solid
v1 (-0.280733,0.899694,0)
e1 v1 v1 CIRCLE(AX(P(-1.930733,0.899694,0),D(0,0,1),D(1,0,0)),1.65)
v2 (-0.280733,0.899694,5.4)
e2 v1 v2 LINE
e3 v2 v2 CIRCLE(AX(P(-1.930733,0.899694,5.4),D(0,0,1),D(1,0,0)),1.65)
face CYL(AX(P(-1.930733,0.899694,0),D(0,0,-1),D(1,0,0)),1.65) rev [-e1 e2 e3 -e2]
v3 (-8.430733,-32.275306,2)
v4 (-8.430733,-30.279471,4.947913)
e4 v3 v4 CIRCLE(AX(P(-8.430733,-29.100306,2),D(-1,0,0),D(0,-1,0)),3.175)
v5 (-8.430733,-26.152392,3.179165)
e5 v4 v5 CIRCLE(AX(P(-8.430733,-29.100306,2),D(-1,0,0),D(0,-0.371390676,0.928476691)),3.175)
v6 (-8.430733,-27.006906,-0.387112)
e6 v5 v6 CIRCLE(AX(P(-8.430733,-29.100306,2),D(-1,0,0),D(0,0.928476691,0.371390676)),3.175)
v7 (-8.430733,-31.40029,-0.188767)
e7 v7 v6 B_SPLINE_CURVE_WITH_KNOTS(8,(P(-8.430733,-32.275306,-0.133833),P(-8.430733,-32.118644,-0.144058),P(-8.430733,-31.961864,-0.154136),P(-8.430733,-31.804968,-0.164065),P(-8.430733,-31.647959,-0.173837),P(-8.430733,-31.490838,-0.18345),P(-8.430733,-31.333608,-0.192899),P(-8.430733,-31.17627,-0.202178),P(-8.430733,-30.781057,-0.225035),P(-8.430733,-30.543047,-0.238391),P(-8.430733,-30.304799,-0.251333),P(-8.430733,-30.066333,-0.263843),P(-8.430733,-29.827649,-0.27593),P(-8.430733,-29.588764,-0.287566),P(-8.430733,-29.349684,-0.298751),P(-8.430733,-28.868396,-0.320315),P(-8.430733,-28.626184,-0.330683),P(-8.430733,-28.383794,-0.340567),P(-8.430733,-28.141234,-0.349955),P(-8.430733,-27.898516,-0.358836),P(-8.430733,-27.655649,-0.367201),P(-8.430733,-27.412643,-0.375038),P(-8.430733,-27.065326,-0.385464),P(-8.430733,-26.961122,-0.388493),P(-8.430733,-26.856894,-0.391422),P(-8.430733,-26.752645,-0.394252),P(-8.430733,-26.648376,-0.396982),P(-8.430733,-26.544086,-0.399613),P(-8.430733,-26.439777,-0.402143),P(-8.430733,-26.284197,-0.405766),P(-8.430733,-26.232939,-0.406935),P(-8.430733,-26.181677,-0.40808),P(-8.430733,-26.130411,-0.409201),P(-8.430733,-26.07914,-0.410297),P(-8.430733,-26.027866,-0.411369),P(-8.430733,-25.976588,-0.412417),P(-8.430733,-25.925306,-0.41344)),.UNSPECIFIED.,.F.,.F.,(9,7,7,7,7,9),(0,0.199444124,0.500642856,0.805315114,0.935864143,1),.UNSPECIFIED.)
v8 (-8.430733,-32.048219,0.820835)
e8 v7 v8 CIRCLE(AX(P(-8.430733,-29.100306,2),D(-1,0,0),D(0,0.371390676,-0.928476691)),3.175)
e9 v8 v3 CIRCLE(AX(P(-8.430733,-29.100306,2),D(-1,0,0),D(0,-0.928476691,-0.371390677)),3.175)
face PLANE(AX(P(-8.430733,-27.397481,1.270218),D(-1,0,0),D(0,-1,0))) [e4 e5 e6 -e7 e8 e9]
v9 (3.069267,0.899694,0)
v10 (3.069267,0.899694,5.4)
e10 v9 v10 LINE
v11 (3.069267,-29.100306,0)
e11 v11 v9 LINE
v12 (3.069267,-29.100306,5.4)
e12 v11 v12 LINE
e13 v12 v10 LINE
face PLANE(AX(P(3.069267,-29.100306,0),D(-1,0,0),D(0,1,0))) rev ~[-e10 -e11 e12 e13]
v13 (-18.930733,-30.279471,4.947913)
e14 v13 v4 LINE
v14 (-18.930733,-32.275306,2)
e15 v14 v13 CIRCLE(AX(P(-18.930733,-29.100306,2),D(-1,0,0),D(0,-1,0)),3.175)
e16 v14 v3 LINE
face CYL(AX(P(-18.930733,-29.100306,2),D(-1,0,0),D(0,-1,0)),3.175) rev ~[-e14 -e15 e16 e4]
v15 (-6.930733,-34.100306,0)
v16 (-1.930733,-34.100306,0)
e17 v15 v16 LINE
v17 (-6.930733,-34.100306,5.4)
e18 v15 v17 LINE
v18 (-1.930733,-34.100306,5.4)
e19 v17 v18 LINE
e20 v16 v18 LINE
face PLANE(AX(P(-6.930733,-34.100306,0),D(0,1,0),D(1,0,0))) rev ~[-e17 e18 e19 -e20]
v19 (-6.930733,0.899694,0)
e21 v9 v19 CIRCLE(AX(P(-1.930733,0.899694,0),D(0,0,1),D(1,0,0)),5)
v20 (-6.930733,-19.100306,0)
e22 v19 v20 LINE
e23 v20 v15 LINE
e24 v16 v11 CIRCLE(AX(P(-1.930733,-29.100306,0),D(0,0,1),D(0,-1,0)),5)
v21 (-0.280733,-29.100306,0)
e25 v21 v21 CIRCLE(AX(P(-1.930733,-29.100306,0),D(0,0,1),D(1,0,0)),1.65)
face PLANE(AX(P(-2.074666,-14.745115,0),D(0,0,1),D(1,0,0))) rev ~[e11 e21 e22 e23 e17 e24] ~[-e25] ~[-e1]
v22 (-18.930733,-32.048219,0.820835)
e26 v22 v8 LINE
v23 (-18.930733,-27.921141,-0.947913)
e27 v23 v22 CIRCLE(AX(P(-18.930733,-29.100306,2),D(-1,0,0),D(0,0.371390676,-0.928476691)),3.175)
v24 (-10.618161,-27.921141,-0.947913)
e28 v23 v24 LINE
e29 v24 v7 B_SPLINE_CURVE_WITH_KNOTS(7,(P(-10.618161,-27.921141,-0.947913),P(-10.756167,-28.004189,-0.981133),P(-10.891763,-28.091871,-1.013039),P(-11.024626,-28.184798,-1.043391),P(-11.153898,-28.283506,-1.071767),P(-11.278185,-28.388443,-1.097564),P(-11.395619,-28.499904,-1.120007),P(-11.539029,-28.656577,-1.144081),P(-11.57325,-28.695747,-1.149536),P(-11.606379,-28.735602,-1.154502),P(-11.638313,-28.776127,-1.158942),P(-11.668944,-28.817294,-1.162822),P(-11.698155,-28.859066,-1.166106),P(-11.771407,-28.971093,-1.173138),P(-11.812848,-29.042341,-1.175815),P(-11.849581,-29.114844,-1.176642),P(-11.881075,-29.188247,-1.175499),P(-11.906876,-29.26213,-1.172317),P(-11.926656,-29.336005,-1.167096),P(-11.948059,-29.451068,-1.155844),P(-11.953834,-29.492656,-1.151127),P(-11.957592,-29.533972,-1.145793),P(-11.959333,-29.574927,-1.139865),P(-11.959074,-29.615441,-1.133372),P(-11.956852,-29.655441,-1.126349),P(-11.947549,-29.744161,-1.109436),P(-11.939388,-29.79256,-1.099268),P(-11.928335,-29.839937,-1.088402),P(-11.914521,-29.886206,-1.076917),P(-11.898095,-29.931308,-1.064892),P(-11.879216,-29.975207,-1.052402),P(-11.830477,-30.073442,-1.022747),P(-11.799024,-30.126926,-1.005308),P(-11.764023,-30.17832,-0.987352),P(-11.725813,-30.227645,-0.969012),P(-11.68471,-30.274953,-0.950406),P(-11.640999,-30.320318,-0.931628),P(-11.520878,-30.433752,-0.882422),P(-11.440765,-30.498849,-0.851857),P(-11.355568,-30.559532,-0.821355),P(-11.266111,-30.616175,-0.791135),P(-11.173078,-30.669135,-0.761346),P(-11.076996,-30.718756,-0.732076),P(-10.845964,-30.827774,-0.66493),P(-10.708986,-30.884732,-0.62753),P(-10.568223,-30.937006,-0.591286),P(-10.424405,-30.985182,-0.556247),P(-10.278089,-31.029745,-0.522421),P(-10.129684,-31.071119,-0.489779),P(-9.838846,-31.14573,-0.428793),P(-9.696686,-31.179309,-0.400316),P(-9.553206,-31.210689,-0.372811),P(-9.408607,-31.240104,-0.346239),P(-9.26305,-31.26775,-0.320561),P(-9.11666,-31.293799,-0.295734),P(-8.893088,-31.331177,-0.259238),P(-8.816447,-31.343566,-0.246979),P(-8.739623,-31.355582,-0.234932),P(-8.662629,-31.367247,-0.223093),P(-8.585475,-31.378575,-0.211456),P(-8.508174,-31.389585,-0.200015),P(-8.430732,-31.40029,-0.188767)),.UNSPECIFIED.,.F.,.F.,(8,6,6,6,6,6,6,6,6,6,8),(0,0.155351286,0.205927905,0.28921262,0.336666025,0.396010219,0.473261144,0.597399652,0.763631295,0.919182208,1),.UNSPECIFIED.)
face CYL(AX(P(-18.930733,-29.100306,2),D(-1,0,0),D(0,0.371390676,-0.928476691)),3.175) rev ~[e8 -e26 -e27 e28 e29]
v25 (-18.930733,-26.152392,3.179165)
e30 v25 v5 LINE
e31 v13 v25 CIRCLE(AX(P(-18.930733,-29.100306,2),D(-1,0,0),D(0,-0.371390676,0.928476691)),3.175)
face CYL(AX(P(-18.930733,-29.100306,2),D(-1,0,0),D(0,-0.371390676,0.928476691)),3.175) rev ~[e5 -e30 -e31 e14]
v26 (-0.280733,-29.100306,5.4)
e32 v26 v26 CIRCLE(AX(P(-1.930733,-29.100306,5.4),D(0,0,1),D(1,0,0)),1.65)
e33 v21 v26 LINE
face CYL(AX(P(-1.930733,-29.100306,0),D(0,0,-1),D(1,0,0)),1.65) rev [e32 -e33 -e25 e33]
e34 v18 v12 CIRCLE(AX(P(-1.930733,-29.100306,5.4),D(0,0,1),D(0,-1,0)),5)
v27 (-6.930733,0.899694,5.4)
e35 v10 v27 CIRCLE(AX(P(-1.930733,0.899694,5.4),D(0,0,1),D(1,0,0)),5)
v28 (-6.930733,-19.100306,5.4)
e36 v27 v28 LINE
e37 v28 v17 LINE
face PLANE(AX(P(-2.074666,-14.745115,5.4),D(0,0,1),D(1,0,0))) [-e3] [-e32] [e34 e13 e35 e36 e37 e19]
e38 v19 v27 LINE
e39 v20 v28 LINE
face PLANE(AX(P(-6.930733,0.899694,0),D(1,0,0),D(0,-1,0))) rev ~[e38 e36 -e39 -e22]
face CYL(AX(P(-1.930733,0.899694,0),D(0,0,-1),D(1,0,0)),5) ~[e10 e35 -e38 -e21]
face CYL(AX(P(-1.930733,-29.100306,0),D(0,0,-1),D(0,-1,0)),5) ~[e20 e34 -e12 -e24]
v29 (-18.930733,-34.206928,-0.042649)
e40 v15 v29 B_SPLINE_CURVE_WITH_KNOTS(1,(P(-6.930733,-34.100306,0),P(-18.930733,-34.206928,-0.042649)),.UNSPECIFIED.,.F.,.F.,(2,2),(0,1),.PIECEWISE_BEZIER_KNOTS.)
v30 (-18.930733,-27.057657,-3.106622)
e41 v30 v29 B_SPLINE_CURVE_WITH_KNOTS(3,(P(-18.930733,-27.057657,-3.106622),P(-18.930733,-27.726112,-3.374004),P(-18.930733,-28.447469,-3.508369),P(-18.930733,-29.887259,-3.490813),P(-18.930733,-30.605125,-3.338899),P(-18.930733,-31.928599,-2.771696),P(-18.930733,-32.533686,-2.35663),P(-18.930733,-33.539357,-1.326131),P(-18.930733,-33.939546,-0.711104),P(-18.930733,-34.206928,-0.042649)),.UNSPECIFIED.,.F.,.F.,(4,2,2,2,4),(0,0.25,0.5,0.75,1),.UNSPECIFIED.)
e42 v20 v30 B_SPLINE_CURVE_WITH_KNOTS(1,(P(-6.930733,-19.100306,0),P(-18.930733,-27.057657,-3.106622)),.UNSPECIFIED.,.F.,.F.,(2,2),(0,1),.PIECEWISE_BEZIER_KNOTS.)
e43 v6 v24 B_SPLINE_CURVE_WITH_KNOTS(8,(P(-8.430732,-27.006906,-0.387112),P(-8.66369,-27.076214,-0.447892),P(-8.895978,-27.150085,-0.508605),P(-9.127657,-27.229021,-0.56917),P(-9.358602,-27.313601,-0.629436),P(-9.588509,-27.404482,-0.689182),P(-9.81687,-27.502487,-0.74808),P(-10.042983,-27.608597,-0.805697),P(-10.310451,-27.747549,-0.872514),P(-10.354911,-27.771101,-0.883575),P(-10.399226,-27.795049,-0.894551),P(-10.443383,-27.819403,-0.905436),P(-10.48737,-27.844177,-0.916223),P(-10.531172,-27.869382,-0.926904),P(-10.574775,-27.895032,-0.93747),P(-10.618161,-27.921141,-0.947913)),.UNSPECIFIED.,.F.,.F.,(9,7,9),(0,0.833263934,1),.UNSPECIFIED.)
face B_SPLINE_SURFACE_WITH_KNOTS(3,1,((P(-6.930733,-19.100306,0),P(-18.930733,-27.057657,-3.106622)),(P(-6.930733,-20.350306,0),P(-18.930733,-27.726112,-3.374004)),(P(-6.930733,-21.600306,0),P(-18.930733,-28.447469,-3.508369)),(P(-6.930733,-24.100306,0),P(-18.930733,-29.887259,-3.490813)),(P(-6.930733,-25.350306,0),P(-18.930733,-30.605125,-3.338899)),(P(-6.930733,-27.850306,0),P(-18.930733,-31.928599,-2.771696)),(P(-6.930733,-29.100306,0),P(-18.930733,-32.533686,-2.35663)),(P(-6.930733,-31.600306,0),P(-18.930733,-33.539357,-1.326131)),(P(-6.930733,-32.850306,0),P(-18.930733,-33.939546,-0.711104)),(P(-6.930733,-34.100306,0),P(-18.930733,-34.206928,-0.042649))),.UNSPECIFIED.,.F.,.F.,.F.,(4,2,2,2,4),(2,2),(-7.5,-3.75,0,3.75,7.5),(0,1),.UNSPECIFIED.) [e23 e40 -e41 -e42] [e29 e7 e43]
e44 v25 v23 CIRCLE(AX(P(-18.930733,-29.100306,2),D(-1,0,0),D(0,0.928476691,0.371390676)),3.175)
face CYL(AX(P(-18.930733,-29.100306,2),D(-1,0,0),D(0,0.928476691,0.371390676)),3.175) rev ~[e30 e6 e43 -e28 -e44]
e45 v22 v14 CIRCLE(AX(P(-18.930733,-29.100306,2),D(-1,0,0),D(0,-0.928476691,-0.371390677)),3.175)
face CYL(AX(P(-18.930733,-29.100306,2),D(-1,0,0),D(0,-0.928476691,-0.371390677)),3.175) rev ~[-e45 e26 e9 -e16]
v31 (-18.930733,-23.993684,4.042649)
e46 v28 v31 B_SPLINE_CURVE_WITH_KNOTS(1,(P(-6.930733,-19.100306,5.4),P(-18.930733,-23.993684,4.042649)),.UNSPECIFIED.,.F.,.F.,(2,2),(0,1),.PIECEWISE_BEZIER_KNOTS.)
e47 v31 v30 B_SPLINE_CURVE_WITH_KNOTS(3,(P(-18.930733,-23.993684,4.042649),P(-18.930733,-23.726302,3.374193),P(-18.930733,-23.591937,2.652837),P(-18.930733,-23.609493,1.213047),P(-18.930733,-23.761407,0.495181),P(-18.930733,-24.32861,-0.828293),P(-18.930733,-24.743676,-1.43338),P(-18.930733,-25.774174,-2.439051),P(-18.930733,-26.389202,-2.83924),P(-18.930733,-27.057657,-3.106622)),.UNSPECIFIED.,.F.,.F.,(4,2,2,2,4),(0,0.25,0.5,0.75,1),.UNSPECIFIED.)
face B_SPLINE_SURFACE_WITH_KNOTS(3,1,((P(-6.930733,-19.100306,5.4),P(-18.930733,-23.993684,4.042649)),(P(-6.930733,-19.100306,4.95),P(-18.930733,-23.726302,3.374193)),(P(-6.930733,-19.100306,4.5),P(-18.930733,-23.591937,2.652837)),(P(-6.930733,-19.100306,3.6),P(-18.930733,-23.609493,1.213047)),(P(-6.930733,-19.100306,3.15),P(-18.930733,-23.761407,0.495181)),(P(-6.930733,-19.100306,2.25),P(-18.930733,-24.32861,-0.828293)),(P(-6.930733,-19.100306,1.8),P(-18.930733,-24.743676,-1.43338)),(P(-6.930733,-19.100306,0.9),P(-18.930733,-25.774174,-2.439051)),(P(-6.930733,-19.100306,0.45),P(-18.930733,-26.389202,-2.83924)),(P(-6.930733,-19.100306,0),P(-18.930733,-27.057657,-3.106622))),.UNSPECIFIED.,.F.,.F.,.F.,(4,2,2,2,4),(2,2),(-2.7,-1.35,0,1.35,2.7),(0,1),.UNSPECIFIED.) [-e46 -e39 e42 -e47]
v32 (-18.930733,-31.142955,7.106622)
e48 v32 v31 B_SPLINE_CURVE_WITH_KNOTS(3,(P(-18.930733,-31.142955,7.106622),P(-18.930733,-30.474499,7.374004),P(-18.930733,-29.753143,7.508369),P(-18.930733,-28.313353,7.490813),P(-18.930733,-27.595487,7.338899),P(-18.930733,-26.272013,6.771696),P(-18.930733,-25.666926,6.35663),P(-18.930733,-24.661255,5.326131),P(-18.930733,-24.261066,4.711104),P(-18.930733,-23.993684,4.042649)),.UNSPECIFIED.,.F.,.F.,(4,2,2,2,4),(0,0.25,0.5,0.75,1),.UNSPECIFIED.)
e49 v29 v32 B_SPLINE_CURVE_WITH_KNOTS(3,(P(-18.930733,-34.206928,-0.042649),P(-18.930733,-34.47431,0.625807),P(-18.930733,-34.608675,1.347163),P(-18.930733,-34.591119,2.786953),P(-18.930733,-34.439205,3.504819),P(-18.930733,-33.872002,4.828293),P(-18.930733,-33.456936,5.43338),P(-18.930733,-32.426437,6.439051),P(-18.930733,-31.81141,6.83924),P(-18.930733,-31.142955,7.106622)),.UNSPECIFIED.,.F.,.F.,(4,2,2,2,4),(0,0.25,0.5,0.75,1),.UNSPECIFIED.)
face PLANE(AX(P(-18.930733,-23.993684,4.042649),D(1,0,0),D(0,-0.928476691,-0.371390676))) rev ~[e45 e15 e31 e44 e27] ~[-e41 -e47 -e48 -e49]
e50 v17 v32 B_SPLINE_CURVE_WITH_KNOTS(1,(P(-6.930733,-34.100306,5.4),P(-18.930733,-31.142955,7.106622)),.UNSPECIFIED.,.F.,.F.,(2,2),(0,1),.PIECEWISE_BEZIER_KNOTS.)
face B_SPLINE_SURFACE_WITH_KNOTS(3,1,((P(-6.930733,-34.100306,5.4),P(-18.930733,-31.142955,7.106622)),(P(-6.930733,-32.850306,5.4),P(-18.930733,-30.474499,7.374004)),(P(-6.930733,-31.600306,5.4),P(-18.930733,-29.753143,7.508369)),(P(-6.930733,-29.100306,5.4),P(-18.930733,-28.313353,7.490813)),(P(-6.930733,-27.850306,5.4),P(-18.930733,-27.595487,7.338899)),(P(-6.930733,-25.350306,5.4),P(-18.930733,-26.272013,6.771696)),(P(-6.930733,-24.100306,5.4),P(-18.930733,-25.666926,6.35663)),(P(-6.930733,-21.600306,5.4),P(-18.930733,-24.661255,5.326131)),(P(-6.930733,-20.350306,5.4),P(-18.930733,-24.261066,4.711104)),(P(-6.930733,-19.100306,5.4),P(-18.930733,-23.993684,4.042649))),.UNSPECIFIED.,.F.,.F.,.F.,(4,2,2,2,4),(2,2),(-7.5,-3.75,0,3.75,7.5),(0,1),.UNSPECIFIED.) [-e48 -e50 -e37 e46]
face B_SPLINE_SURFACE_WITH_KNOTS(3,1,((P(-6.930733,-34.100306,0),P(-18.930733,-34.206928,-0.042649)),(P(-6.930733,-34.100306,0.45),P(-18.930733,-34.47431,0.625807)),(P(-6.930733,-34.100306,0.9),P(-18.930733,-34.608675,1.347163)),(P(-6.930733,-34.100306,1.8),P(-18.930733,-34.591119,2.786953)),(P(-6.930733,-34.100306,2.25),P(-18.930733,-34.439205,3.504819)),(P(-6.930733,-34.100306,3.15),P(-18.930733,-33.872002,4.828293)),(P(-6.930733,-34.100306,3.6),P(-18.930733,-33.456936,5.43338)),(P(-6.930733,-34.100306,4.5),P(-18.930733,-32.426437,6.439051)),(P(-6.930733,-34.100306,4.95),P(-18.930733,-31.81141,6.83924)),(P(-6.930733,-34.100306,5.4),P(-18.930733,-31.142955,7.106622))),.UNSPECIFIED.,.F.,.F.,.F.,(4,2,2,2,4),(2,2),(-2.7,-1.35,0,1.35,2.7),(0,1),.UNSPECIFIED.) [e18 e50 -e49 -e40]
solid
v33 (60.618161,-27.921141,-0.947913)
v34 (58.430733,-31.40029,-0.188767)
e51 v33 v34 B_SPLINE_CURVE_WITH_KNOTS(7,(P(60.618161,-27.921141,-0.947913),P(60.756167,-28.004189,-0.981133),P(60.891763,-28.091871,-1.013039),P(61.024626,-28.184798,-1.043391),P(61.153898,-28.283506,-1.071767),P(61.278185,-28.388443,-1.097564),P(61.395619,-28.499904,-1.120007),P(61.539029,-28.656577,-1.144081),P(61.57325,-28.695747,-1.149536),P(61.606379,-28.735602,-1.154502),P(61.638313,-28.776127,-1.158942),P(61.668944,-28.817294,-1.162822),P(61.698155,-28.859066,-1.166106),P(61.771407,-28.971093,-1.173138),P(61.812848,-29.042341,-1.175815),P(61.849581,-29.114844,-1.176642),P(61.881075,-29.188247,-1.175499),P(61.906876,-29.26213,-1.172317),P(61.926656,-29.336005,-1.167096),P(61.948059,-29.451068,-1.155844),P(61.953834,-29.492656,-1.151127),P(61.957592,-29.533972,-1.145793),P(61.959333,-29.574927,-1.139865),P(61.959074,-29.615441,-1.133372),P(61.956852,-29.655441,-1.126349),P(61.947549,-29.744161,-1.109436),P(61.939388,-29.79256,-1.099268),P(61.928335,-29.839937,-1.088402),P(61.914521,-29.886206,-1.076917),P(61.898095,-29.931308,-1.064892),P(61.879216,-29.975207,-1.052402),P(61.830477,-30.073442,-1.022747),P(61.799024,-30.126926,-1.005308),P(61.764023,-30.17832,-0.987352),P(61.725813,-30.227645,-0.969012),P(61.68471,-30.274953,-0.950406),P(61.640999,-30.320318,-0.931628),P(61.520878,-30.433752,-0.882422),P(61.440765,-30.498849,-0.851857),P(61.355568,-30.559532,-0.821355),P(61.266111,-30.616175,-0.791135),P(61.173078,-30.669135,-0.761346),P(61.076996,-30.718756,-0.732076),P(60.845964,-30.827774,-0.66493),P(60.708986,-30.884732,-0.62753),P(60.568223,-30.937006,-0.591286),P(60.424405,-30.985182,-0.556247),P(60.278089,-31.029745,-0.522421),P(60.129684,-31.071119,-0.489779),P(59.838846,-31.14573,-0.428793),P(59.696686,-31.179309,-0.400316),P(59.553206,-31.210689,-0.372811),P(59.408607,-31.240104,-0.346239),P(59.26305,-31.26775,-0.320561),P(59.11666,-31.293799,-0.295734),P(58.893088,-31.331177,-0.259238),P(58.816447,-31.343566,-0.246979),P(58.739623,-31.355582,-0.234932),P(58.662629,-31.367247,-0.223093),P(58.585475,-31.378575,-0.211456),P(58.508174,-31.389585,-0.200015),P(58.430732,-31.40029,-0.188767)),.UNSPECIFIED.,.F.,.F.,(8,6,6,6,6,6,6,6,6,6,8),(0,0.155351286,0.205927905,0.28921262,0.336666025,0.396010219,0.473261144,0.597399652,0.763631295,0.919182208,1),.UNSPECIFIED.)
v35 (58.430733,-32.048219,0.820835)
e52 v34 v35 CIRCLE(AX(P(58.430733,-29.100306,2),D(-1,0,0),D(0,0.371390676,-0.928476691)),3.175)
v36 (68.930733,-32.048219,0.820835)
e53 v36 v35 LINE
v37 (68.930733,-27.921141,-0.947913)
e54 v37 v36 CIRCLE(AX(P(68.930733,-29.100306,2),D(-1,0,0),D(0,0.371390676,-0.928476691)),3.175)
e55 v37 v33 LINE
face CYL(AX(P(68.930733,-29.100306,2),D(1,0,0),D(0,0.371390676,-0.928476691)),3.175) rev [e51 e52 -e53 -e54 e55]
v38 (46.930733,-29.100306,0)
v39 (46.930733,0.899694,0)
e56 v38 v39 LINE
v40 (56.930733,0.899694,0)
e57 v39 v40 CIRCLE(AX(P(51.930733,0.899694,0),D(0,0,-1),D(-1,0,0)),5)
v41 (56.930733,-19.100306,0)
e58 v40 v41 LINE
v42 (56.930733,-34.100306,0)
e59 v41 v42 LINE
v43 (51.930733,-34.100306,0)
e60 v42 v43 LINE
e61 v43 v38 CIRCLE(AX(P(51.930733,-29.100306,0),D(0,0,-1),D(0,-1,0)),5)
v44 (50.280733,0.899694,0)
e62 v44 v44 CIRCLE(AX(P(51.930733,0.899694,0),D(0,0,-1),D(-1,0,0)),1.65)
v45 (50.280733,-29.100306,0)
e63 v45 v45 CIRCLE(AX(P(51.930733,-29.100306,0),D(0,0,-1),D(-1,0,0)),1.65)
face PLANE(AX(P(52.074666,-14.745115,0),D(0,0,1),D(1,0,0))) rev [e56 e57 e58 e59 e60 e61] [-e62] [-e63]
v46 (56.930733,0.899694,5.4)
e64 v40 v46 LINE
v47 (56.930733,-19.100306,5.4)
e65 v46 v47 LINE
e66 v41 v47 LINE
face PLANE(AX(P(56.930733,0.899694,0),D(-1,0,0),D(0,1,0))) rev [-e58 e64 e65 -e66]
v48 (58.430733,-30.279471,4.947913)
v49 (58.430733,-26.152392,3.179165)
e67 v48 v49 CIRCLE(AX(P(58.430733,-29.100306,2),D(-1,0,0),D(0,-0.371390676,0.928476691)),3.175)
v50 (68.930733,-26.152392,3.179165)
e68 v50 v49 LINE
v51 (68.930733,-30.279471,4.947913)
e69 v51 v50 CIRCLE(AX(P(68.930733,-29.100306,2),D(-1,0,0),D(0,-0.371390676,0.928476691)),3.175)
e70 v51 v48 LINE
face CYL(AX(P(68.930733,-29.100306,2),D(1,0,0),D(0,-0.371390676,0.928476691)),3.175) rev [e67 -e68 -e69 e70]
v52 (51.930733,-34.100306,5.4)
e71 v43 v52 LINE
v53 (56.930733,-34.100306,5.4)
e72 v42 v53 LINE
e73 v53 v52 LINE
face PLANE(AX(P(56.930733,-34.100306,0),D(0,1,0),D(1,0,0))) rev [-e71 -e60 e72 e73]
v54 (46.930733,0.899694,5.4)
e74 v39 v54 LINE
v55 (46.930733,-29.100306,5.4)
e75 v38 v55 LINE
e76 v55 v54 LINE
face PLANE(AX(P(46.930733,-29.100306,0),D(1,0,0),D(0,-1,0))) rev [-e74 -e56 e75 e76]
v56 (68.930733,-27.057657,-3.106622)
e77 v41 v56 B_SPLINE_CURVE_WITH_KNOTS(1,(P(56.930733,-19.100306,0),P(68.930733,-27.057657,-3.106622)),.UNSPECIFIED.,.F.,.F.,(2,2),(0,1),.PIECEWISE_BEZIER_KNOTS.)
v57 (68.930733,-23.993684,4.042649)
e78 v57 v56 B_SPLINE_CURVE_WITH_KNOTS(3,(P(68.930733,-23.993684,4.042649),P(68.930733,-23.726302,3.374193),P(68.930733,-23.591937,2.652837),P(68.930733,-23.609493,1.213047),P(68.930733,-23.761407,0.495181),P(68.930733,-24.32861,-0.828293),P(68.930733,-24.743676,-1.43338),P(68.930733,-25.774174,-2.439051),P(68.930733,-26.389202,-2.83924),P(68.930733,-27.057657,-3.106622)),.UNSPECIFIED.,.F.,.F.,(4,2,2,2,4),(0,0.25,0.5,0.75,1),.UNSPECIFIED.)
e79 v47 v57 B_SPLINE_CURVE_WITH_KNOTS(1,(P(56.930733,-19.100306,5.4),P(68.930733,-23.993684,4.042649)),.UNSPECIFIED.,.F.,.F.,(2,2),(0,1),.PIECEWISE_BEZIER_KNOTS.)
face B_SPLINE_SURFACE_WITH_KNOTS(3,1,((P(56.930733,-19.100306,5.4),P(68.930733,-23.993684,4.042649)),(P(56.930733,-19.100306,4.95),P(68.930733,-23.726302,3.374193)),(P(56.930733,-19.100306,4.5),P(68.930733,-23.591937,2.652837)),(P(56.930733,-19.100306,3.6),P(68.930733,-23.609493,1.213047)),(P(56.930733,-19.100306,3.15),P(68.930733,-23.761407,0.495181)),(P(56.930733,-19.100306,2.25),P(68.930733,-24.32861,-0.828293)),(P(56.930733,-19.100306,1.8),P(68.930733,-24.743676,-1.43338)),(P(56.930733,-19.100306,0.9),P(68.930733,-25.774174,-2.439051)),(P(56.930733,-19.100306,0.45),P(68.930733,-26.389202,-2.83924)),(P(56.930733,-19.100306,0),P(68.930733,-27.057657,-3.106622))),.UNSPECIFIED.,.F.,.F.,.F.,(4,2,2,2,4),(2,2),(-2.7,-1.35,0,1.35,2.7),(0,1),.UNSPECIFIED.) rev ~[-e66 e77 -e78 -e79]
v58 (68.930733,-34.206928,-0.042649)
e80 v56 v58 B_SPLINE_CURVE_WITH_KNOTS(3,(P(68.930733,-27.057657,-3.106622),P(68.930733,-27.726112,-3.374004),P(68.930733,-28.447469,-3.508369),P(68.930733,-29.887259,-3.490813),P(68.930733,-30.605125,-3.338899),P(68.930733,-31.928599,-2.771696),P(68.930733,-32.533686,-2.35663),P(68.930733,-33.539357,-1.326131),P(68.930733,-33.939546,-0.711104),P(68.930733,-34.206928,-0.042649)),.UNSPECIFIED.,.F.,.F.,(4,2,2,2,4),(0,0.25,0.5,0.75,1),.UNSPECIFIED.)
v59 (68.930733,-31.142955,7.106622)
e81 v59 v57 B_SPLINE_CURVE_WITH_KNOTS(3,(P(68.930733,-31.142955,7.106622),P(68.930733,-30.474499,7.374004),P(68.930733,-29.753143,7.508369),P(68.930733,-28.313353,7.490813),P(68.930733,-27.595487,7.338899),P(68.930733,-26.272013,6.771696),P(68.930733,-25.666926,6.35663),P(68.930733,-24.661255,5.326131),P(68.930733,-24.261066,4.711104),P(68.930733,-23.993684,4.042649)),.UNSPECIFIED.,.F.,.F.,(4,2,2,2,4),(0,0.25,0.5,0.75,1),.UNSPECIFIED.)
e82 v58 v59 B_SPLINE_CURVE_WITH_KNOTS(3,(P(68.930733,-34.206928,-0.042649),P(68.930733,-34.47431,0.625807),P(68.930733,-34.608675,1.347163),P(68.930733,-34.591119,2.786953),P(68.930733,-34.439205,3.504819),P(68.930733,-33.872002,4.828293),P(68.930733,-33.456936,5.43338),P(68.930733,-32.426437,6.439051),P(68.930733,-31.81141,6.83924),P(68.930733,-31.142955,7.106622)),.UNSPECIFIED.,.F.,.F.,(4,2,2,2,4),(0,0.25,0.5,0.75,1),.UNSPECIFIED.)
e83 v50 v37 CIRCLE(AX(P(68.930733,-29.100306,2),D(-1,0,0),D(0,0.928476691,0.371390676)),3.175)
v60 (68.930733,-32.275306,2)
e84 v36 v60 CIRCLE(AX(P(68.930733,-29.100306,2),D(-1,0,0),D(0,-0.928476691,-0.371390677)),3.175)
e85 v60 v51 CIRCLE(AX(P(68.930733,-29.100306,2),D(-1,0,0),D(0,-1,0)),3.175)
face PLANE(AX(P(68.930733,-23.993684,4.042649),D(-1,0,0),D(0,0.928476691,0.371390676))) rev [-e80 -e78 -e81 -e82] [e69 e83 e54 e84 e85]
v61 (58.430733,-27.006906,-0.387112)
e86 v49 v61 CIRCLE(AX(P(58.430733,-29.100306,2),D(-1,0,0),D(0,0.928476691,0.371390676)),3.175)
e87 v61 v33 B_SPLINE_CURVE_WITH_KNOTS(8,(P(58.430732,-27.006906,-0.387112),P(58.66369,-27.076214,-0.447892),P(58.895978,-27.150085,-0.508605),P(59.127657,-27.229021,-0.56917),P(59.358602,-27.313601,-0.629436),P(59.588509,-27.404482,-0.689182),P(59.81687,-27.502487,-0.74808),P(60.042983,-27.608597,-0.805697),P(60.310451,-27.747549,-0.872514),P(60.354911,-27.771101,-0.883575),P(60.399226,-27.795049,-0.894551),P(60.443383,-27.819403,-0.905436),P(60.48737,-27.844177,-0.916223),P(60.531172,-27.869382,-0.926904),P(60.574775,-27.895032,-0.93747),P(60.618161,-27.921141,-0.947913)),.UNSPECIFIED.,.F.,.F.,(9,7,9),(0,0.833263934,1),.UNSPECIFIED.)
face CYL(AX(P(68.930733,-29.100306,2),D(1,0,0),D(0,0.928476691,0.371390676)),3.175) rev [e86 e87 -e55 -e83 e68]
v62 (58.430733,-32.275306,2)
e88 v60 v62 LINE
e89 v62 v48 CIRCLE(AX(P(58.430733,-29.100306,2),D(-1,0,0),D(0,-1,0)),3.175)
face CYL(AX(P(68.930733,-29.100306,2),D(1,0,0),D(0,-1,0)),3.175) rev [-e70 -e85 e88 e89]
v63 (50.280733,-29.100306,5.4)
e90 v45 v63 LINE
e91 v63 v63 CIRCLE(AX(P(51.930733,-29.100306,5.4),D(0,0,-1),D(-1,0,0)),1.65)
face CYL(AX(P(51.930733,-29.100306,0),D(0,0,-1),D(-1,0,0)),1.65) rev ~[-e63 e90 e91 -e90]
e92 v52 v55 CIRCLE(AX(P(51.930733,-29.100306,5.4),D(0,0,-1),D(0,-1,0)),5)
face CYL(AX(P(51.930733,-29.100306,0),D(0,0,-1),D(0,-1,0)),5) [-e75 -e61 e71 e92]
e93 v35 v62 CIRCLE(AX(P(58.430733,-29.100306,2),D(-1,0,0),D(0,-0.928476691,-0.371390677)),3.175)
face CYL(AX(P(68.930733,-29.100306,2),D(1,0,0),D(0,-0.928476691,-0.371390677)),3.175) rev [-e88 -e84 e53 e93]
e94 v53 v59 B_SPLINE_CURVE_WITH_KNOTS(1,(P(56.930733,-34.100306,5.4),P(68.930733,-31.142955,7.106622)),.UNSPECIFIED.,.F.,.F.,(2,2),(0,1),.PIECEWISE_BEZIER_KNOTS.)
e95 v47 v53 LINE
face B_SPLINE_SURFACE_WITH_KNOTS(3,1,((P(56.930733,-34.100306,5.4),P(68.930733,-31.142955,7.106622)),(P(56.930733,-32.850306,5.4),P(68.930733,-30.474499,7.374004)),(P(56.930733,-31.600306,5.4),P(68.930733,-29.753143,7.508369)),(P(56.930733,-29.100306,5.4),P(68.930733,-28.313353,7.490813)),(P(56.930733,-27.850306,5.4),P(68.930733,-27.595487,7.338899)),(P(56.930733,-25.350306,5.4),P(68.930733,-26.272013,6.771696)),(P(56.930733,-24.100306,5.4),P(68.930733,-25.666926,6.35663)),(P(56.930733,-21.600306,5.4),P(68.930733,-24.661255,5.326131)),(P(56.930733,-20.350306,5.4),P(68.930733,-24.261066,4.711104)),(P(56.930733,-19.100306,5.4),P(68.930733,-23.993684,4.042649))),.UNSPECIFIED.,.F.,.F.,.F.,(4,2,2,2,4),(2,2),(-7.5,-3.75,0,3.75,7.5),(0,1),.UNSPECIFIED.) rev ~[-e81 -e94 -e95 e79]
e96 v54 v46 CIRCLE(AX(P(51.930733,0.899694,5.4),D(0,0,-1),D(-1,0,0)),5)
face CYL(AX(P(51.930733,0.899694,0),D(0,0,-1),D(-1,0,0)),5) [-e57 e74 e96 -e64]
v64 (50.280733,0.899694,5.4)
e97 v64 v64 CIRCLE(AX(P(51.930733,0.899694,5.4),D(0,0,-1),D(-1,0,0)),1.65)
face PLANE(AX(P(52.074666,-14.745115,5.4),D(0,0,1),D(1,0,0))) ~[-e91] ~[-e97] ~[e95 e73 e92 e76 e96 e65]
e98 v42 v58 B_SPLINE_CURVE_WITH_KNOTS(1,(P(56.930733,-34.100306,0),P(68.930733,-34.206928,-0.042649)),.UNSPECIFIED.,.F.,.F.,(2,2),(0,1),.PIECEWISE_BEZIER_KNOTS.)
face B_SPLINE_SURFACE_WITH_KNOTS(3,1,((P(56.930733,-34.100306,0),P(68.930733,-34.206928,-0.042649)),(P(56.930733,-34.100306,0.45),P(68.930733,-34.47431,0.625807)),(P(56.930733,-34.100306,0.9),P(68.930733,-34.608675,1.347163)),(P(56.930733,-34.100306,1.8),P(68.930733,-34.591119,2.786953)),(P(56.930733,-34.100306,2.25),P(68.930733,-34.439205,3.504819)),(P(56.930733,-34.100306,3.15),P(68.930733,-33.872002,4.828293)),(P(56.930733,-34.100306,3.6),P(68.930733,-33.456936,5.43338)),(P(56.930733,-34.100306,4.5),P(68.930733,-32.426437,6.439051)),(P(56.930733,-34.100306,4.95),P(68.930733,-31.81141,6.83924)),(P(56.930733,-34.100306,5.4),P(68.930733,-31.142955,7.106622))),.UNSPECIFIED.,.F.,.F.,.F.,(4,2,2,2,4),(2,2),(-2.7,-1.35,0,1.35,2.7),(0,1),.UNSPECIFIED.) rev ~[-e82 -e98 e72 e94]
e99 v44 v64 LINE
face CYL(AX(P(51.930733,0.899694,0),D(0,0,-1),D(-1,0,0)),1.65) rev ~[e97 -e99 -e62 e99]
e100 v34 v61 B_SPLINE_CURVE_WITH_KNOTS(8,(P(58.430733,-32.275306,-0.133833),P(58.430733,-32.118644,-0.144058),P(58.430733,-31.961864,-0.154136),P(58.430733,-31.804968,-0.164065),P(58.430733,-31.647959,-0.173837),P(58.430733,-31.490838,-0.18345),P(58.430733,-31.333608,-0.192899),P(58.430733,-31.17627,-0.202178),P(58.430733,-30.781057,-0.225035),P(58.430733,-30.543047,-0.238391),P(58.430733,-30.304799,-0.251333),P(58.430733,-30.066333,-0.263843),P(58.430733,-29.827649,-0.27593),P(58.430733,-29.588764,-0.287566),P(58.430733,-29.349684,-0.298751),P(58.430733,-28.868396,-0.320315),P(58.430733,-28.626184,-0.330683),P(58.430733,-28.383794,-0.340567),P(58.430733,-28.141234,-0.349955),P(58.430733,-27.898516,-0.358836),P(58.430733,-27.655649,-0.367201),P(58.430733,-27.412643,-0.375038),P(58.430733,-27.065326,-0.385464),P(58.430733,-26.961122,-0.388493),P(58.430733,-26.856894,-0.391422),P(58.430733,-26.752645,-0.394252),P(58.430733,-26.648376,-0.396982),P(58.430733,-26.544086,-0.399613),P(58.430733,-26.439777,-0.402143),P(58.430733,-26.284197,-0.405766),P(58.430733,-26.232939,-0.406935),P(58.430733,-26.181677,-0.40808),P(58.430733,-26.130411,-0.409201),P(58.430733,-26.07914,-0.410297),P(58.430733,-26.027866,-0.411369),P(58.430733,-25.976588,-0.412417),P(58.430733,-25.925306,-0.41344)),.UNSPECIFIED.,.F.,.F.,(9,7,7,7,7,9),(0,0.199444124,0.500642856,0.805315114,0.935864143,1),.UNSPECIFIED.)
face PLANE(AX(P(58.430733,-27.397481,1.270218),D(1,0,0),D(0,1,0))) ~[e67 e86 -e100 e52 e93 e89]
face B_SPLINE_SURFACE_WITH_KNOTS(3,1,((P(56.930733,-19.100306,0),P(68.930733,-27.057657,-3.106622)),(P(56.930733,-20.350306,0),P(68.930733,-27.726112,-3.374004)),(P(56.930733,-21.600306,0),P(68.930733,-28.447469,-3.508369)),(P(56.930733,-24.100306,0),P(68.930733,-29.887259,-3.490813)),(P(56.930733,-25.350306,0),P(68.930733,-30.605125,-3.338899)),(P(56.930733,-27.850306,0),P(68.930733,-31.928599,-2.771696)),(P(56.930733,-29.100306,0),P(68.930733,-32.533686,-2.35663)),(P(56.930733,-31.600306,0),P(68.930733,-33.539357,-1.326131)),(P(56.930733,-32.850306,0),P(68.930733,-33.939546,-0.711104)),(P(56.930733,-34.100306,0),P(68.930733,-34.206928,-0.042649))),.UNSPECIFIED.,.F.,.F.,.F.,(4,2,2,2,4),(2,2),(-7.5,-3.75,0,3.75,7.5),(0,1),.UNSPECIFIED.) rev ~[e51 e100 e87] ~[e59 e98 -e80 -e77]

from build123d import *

# Parameters (mm, degrees)
F0_R     = 1.65
F1_DEPTH = 5.4
F2_W     = 15
F2_H     = 5.4
F7_DEPTH = 10.5


# Not quite as in the source:
# - the arcs of a loft's sections are written as splines that run evenly, so that the points pair up as in the source's solid


with BuildPart() as f1:
    # F0 (on Top) → F1 (new body)
    with BuildSketch(Plane.XY):
        with BuildLine():
            ThreePointArc((3.0692669051, 0.8996940404), (-1.9307330949, 5.8996940404), (-6.9307330949, 0.8996940404))
            Line((-6.9307330949, 0.8996940404), (-6.9307330949, -29.1003059596))
            Line((-6.9307330949, -29.1003059596), (-6.9307330949, -34.1003059596))
            Line((-6.9307330949, -34.1003059596), (-1.9307330949, -34.1003059596))
            ThreePointArc((-1.9307330949, -34.1003059596), (1.604800811, -32.6358398655), (3.0692669051, -29.1003059596))
            Line((3.0692669051, -29.1003059596), (3.0692669051, 0.8996940404))
        make_face()
        with Locations((-1.9307330949, -29.1003059596)):
            Circle(F0_R, mode=Mode.SUBTRACT)
        with Locations((-1.9307330949, 0.8996940404)):
            Circle(F0_R, mode=Mode.SUBTRACT)
    extrude(amount=F1_DEPTH)

    # F2 (on face) → F5 section 0
    with BuildSketch(Plane(origin=(-6.9307330949, 0, 0), x_dir=(0, -1, 0), z_dir=(-1, 0, 0))):
        with Locations((26.6003059596, 2.7)):
            Rectangle(F2_W, F2_H)
    # F4 (on offset) → F5 section 1
    with BuildSketch(Plane(origin=(-18.9307330949, 0, 0), x_dir=(0, -1, 0), z_dir=(-1, 0, 0))):
        with BuildLine():
            add(Edge.make_bspline(
                [(34.2069277595, -0.0426487199), (34.4743098516, 0.6258065105), (34.6086750437, 1.3471634111), (34.5911192444, 2.7869530163), (34.4392051605, 3.5048192253), (33.8720020889, 4.8282930591), (33.4569362713, 5.4333799536), (32.4264374532, 6.4390511222), (31.81140991, 6.8392397077), (31.1429546795, 7.1066217999)],
                knots=[0, 0, 0, 0, 0.25, 0.25, 0.5, 0.5, 0.75, 0.75, 1, 1, 1, 1], degree=3))
            add(Edge.make_bspline(
                [(31.1429546795, 7.1066217999), (30.4744994491, 7.3740038921), (29.7531425485, 7.5083690841), (28.3133529433, 7.4908132848), (27.5954867343, 7.3388992009), (26.2720129005, 6.7716961293), (25.666926006, 6.3566303117), (24.6612548374, 5.3261314936), (24.2610662519, 4.7111039504), (23.9936841597, 4.0426487199)],
                knots=[0, 0, 0, 0, 0.25, 0.25, 0.5, 0.5, 0.75, 0.75, 1, 1, 1, 1], degree=3))
            add(Edge.make_bspline(
                [(23.9936841597, 4.0426487199), (23.7263020675, 3.3741934895), (23.5919368755, 2.6528365889), (23.6094926748, 1.2130469837), (23.7614067587, 0.4951807747), (24.3286098303, -0.8282930591), (24.7436756479, -1.4333799536), (25.774174466, -2.4390511222), (26.3892020092, -2.8392397077), (27.0576572396, -3.1066217999)],
                knots=[0, 0, 0, 0, 0.25, 0.25, 0.5, 0.5, 0.75, 0.75, 1, 1, 1, 1], degree=3))
            add(Edge.make_bspline(
                [(27.0576572396, -3.1066217999), (27.7261124701, -3.3740038921), (28.4474693707, -3.5083690841), (29.8872589759, -3.4908132848), (30.6051251848, -3.3388992009), (31.9285990187, -2.7716961293), (32.5336859132, -2.3566303117), (33.5393570818, -1.3261314936), (33.9395456673, -0.7111039504), (34.2069277595, -0.0426487199)],
                knots=[0, 0, 0, 0, 0.25, 0.25, 0.5, 0.5, 0.75, 0.75, 1, 1, 1, 1], degree=3))
        make_face()
    loft(ruled=True)

    # F6 (on face) → F7 (cut)
    with BuildSketch(Plane(origin=(-18.9307330949, 0, 0), x_dir=(0, -1, 0), z_dir=(-1, 0, 0))):
        with BuildLine():
            ThreePointArc((26.152392466, 3.1791653974), (26.1820204893, 0.749306227), (27.9211405622, -0.9479134936))
            Line((27.9211405622, -0.9479134936), (29.1003059596, 2))
            Line((29.1003059596, 2), (26.152392466, 3.1791653974))
        make_face()
        with BuildLine():
            Line((29.1003059596, 2), (27.9211405622, -0.9479134936))
            ThreePointArc((27.9211405622, -0.9479134936), (30.3509997326, -0.9182854703), (32.0482194531, 0.8208346026))
            Line((32.0482194531, 0.8208346026), (29.1003059596, 2))
        make_face()
        with BuildLine():
            Line((26.152392466, 3.1791653974), (29.1003059596, 2))
            Line((29.1003059596, 2), (30.279471357, 4.9479134936))
            ThreePointArc((30.279471357, 4.9479134936), (27.8496121866, 4.9182854703), (26.152392466, 3.1791653974))
        make_face()
        with BuildLine():
            Line((30.279471357, 4.9479134936), (29.1003059596, 2))
            Line((29.1003059596, 2), (32.0482194531, 0.8208346026))
            ThreePointArc((32.0482194531, 0.8208346026), (32.2180174875, 1.3995836203), (32.2753059596, 2))
            ThreePointArc((32.2753059596, 2), (31.7294194163, 3.7799964695), (30.279471357, 4.9479134936))
        make_face()
    extrude(amount=-F7_DEPTH, mode=Mode.SUBTRACT)


with BuildPart() as f9_1:
    # F9: instance of F1
    add(f1.part.mirror(Plane.YZ.offset(25)))


solid = Compound([f1.part, f9_1.part])
